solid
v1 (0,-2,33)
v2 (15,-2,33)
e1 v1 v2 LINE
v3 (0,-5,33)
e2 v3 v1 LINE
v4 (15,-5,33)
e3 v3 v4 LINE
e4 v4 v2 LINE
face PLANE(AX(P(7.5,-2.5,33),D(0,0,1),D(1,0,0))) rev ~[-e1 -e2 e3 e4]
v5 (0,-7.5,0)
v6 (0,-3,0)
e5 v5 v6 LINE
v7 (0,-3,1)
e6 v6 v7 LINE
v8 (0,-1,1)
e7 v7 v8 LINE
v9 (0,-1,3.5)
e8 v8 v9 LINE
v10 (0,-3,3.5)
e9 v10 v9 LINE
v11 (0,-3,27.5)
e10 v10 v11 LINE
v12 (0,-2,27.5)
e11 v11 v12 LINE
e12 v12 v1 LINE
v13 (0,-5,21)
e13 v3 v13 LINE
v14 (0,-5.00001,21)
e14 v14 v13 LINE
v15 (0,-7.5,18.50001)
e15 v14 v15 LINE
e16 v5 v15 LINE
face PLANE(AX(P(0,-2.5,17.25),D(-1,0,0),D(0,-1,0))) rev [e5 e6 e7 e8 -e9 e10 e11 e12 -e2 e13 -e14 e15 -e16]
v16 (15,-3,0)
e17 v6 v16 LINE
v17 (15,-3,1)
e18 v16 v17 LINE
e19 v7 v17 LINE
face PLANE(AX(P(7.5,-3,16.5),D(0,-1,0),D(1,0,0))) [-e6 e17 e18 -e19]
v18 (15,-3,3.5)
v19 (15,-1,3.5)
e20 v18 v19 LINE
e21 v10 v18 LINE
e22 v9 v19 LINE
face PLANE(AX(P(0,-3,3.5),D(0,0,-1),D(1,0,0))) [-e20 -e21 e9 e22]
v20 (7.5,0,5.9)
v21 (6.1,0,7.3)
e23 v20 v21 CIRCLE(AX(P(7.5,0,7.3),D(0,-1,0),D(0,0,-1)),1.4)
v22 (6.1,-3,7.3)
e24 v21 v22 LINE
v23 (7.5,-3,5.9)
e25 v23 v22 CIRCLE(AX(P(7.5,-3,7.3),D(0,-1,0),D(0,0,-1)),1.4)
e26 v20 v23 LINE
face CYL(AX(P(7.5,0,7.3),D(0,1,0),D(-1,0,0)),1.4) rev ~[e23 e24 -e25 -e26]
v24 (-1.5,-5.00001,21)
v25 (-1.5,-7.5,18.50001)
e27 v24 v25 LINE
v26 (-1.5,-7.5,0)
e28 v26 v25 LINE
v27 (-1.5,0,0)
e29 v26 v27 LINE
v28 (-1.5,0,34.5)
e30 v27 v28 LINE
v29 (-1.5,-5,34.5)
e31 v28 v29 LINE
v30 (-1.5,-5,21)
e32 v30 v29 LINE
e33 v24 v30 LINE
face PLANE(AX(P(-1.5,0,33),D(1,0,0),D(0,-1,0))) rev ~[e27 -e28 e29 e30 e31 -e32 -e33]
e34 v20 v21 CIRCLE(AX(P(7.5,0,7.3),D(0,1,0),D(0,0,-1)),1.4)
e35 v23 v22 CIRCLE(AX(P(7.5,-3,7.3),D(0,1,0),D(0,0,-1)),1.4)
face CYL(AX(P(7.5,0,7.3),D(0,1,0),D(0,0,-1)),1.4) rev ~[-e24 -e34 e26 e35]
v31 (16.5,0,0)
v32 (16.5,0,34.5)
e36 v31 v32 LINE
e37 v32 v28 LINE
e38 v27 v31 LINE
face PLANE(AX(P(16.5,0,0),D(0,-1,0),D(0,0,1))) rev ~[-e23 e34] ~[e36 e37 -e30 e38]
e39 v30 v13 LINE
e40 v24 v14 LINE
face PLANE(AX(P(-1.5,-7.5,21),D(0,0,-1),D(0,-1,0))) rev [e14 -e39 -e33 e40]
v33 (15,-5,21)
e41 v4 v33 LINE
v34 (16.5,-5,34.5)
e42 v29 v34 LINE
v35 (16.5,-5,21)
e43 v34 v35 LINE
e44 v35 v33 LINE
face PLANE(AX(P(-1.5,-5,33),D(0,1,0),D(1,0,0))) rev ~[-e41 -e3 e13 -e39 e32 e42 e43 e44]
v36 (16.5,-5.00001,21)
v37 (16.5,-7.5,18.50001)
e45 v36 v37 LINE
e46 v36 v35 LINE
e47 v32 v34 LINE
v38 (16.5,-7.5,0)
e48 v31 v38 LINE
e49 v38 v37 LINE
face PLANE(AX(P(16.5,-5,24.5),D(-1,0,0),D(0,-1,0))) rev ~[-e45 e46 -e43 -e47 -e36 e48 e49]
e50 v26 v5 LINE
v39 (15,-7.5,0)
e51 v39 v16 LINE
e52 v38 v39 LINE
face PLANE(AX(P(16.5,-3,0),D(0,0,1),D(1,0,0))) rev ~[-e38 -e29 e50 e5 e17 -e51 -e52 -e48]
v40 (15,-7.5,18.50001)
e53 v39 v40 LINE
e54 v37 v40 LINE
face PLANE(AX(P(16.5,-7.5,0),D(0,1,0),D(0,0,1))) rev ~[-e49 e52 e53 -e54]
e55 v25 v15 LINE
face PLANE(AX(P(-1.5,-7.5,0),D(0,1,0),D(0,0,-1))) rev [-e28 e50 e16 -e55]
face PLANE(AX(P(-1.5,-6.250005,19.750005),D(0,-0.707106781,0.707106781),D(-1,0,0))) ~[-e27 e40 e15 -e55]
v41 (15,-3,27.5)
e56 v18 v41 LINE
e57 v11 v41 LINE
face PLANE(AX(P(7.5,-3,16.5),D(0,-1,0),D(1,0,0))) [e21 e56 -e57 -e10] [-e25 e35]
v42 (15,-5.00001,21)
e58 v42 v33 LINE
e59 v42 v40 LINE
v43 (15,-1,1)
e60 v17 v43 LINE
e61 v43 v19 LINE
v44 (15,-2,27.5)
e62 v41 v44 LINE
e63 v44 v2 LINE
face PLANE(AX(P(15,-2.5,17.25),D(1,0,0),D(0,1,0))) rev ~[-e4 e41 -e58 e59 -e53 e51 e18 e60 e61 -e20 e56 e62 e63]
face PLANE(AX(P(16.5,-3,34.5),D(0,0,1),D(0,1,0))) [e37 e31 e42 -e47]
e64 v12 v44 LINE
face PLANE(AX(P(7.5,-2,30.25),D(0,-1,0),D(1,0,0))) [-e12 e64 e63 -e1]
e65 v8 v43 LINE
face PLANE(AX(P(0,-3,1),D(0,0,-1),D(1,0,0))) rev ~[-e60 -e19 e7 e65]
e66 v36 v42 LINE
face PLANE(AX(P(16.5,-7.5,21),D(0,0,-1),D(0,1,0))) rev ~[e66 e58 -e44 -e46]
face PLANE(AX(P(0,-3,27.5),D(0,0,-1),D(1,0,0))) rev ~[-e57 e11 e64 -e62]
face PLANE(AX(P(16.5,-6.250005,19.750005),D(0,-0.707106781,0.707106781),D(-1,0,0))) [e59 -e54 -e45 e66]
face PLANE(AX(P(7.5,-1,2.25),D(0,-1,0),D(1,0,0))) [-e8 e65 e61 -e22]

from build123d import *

# Parameters (mm, degrees)
F0_W      = 15
F0_H      = 33
F1_DEPTH  = 3
F2_W      = 15
F2_H      = 2.5
F3_DEPTH  = 2
F4_W      = 15
F4_H      = 5.5
F5_DEPTH  = 1
F7_DEPTH  = 25
F9_DEPTH  = 1.5
F10_W     = 2.5
F10_H     = 21
F11_DEPTH = 1.5
F14_SIZE  = 2.49999
F15_W     = 3
F15_H     = 34.5
F16_DEPTH = 8.25
F17_W     = 8.25
F17_H     = 10
F18_DEPTH = 25
F19_DEPTH = 6
F21_DEPTH = 25
F22_DEPTH = 25


# Not quite as in the source:
# - a fillet or chamfer is up to 0.001 mm smaller than in the source, because OpenCascade refuses the exact size


with BuildPart() as f1:
    # F0 (on Front) → F1 (new body)
    with BuildSketch(Plane.XZ):
        with Locations((7.5, 16.5)):
            Rectangle(F0_W, F0_H)
    extrude(amount=F1_DEPTH)

    # F2 (on face) → F3 (cut)
    with BuildSketch(Plane.XZ.offset(3)):
        with Locations((7.5, 2.25)):
            Rectangle(F2_W, F2_H)
    extrude(amount=-F3_DEPTH, mode=Mode.SUBTRACT)

    # F4 (on face) → F5 (cut)
    with BuildSketch(Plane.XZ.offset(3)):
        with Locations((7.5, 30.25)):
            Rectangle(F4_W, F4_H)
    extrude(amount=-F5_DEPTH, mode=Mode.SUBTRACT)

    # F6 (on face) → F7 (cut)
    with BuildSketch(Plane(origin=(0, 0, 0), x_dir=(-1, 0, 0), z_dir=(0, 1, 0))):
        with BuildLine():
            ThreePointArc((-7.5, 5.9), (-6.5100505063, 6.3100505063), (-6.1, 7.3))
            ThreePointArc((-6.1, 7.3), (-8.4899494937, 8.2899494937), (-7.5, 5.9))
        make_face()
    extrude(amount=-F7_DEPTH, mode=Mode.SUBTRACT)

    # F8 (on face) → F9 (join)
    with BuildSketch(Plane.XY.offset(33)):
        Polygon((16.5, 0), (0, 0), (-1.5, 0), (-1.5, -5), (15, -5), (16.5, -5), align=None)
    extrude(amount=F9_DEPTH)

    # F10 (on face) → F11 (join, through all)
    with BuildSketch(Plane.YZ.offset(16.5)):
        Polygon((0, 34.5), (-5, 34.5), (-5, 21), (-5, 0), (0, 0), align=None)
        with Locations((-6.25, 10.5)):
            Rectangle(F10_W, F10_H)
    extrude(amount=-F11_DEPTH)

    # F13: F1 across plane


with BuildPart() as f1_1:
    add(f1.part)
    add(f1.part.mirror(Plane.YZ.offset(7.5)))

    # F14 (size 2.5 in the source; OpenCascade refuses exactly that, so slightly less here)
    f14_edges = [f1_1.edges().sort_by_distance(p)[0] for p in [
        (15.75, -7.5, 21),
        (-0.75, -7.5, 21),
    ]]
    chamfer(f14_edges, length=F14_SIZE)

    # F15 (on face) → F16 (join)
    with BuildSketch(Plane.YZ.offset(16.5)):
        with Locations((-1.5, 17.25)):
            Rectangle(F15_W, F15_H)
    extrude(amount=F16_DEPTH)

    # F17 (on face) → F18 (cut)
    with BuildSketch(Plane.XZ.offset(3)):
        with Locations((20.625, 29.5)):
            Rectangle(F17_W, F17_H)
    extrude(amount=-F18_DEPTH, mode=Mode.SUBTRACT)

    # F19 (add): a face of the model
    f19_faces = [f1_1.faces().sort_by_distance(p)[0] for p in [
        (20.625, -3, 12.25),
    ]]
    extrude(f19_faces, amount=F19_DEPTH)

    # F20 (on face) → F21 (cut)
    with BuildSketch(Plane(origin=(0, 0, 0), x_dir=(-1, 0, 0), z_dir=(0, 1, 0))):
        with BuildLine():
            ThreePointArc((-22.15, 8.3), (-20.75, 6.9), (-19.35, 8.3))
            Line((-19.35, 8.3), (-20.75, 8.3))
            Line((-20.75, 8.3), (-22.15, 8.3))
        make_face()
        with BuildLine():
            Line((-20.75, 8.3), (-19.35, 8.3))
            ThreePointArc((-19.35, 8.3), (-19.7600505063, 9.2899494937), (-20.75, 9.7))
            Line((-20.75, 9.7), (-20.75, 8.3))
        make_face()
        with BuildLine():
            ThreePointArc((-19.35, 18.3), (-21.7399494937, 19.2899494937), (-20.75, 16.9))
            ThreePointArc((-20.75, 16.9), (-19.7600505063, 17.3100505063), (-19.35, 18.3))
        make_face()
        with BuildLine():
            Line((-22.15, 8.3), (-20.75, 8.3))
            Line((-20.75, 8.3), (-20.75, 9.7))
            ThreePointArc((-20.75, 9.7), (-21.7399494937, 9.2899494937), (-22.15, 8.3))
        make_face()
    extrude(amount=-F21_DEPTH, mode=Mode.SUBTRACT)

    # F22 (cut): a face of the model
    f22_faces = [f1_1.faces().sort_by_distance(p)[0] for p in [
        (20.625, -4.5, 24.5),
    ]]
    extrude(f22_faces, amount=-F22_DEPTH, mode=Mode.SUBTRACT)


solid = f1_1.part
